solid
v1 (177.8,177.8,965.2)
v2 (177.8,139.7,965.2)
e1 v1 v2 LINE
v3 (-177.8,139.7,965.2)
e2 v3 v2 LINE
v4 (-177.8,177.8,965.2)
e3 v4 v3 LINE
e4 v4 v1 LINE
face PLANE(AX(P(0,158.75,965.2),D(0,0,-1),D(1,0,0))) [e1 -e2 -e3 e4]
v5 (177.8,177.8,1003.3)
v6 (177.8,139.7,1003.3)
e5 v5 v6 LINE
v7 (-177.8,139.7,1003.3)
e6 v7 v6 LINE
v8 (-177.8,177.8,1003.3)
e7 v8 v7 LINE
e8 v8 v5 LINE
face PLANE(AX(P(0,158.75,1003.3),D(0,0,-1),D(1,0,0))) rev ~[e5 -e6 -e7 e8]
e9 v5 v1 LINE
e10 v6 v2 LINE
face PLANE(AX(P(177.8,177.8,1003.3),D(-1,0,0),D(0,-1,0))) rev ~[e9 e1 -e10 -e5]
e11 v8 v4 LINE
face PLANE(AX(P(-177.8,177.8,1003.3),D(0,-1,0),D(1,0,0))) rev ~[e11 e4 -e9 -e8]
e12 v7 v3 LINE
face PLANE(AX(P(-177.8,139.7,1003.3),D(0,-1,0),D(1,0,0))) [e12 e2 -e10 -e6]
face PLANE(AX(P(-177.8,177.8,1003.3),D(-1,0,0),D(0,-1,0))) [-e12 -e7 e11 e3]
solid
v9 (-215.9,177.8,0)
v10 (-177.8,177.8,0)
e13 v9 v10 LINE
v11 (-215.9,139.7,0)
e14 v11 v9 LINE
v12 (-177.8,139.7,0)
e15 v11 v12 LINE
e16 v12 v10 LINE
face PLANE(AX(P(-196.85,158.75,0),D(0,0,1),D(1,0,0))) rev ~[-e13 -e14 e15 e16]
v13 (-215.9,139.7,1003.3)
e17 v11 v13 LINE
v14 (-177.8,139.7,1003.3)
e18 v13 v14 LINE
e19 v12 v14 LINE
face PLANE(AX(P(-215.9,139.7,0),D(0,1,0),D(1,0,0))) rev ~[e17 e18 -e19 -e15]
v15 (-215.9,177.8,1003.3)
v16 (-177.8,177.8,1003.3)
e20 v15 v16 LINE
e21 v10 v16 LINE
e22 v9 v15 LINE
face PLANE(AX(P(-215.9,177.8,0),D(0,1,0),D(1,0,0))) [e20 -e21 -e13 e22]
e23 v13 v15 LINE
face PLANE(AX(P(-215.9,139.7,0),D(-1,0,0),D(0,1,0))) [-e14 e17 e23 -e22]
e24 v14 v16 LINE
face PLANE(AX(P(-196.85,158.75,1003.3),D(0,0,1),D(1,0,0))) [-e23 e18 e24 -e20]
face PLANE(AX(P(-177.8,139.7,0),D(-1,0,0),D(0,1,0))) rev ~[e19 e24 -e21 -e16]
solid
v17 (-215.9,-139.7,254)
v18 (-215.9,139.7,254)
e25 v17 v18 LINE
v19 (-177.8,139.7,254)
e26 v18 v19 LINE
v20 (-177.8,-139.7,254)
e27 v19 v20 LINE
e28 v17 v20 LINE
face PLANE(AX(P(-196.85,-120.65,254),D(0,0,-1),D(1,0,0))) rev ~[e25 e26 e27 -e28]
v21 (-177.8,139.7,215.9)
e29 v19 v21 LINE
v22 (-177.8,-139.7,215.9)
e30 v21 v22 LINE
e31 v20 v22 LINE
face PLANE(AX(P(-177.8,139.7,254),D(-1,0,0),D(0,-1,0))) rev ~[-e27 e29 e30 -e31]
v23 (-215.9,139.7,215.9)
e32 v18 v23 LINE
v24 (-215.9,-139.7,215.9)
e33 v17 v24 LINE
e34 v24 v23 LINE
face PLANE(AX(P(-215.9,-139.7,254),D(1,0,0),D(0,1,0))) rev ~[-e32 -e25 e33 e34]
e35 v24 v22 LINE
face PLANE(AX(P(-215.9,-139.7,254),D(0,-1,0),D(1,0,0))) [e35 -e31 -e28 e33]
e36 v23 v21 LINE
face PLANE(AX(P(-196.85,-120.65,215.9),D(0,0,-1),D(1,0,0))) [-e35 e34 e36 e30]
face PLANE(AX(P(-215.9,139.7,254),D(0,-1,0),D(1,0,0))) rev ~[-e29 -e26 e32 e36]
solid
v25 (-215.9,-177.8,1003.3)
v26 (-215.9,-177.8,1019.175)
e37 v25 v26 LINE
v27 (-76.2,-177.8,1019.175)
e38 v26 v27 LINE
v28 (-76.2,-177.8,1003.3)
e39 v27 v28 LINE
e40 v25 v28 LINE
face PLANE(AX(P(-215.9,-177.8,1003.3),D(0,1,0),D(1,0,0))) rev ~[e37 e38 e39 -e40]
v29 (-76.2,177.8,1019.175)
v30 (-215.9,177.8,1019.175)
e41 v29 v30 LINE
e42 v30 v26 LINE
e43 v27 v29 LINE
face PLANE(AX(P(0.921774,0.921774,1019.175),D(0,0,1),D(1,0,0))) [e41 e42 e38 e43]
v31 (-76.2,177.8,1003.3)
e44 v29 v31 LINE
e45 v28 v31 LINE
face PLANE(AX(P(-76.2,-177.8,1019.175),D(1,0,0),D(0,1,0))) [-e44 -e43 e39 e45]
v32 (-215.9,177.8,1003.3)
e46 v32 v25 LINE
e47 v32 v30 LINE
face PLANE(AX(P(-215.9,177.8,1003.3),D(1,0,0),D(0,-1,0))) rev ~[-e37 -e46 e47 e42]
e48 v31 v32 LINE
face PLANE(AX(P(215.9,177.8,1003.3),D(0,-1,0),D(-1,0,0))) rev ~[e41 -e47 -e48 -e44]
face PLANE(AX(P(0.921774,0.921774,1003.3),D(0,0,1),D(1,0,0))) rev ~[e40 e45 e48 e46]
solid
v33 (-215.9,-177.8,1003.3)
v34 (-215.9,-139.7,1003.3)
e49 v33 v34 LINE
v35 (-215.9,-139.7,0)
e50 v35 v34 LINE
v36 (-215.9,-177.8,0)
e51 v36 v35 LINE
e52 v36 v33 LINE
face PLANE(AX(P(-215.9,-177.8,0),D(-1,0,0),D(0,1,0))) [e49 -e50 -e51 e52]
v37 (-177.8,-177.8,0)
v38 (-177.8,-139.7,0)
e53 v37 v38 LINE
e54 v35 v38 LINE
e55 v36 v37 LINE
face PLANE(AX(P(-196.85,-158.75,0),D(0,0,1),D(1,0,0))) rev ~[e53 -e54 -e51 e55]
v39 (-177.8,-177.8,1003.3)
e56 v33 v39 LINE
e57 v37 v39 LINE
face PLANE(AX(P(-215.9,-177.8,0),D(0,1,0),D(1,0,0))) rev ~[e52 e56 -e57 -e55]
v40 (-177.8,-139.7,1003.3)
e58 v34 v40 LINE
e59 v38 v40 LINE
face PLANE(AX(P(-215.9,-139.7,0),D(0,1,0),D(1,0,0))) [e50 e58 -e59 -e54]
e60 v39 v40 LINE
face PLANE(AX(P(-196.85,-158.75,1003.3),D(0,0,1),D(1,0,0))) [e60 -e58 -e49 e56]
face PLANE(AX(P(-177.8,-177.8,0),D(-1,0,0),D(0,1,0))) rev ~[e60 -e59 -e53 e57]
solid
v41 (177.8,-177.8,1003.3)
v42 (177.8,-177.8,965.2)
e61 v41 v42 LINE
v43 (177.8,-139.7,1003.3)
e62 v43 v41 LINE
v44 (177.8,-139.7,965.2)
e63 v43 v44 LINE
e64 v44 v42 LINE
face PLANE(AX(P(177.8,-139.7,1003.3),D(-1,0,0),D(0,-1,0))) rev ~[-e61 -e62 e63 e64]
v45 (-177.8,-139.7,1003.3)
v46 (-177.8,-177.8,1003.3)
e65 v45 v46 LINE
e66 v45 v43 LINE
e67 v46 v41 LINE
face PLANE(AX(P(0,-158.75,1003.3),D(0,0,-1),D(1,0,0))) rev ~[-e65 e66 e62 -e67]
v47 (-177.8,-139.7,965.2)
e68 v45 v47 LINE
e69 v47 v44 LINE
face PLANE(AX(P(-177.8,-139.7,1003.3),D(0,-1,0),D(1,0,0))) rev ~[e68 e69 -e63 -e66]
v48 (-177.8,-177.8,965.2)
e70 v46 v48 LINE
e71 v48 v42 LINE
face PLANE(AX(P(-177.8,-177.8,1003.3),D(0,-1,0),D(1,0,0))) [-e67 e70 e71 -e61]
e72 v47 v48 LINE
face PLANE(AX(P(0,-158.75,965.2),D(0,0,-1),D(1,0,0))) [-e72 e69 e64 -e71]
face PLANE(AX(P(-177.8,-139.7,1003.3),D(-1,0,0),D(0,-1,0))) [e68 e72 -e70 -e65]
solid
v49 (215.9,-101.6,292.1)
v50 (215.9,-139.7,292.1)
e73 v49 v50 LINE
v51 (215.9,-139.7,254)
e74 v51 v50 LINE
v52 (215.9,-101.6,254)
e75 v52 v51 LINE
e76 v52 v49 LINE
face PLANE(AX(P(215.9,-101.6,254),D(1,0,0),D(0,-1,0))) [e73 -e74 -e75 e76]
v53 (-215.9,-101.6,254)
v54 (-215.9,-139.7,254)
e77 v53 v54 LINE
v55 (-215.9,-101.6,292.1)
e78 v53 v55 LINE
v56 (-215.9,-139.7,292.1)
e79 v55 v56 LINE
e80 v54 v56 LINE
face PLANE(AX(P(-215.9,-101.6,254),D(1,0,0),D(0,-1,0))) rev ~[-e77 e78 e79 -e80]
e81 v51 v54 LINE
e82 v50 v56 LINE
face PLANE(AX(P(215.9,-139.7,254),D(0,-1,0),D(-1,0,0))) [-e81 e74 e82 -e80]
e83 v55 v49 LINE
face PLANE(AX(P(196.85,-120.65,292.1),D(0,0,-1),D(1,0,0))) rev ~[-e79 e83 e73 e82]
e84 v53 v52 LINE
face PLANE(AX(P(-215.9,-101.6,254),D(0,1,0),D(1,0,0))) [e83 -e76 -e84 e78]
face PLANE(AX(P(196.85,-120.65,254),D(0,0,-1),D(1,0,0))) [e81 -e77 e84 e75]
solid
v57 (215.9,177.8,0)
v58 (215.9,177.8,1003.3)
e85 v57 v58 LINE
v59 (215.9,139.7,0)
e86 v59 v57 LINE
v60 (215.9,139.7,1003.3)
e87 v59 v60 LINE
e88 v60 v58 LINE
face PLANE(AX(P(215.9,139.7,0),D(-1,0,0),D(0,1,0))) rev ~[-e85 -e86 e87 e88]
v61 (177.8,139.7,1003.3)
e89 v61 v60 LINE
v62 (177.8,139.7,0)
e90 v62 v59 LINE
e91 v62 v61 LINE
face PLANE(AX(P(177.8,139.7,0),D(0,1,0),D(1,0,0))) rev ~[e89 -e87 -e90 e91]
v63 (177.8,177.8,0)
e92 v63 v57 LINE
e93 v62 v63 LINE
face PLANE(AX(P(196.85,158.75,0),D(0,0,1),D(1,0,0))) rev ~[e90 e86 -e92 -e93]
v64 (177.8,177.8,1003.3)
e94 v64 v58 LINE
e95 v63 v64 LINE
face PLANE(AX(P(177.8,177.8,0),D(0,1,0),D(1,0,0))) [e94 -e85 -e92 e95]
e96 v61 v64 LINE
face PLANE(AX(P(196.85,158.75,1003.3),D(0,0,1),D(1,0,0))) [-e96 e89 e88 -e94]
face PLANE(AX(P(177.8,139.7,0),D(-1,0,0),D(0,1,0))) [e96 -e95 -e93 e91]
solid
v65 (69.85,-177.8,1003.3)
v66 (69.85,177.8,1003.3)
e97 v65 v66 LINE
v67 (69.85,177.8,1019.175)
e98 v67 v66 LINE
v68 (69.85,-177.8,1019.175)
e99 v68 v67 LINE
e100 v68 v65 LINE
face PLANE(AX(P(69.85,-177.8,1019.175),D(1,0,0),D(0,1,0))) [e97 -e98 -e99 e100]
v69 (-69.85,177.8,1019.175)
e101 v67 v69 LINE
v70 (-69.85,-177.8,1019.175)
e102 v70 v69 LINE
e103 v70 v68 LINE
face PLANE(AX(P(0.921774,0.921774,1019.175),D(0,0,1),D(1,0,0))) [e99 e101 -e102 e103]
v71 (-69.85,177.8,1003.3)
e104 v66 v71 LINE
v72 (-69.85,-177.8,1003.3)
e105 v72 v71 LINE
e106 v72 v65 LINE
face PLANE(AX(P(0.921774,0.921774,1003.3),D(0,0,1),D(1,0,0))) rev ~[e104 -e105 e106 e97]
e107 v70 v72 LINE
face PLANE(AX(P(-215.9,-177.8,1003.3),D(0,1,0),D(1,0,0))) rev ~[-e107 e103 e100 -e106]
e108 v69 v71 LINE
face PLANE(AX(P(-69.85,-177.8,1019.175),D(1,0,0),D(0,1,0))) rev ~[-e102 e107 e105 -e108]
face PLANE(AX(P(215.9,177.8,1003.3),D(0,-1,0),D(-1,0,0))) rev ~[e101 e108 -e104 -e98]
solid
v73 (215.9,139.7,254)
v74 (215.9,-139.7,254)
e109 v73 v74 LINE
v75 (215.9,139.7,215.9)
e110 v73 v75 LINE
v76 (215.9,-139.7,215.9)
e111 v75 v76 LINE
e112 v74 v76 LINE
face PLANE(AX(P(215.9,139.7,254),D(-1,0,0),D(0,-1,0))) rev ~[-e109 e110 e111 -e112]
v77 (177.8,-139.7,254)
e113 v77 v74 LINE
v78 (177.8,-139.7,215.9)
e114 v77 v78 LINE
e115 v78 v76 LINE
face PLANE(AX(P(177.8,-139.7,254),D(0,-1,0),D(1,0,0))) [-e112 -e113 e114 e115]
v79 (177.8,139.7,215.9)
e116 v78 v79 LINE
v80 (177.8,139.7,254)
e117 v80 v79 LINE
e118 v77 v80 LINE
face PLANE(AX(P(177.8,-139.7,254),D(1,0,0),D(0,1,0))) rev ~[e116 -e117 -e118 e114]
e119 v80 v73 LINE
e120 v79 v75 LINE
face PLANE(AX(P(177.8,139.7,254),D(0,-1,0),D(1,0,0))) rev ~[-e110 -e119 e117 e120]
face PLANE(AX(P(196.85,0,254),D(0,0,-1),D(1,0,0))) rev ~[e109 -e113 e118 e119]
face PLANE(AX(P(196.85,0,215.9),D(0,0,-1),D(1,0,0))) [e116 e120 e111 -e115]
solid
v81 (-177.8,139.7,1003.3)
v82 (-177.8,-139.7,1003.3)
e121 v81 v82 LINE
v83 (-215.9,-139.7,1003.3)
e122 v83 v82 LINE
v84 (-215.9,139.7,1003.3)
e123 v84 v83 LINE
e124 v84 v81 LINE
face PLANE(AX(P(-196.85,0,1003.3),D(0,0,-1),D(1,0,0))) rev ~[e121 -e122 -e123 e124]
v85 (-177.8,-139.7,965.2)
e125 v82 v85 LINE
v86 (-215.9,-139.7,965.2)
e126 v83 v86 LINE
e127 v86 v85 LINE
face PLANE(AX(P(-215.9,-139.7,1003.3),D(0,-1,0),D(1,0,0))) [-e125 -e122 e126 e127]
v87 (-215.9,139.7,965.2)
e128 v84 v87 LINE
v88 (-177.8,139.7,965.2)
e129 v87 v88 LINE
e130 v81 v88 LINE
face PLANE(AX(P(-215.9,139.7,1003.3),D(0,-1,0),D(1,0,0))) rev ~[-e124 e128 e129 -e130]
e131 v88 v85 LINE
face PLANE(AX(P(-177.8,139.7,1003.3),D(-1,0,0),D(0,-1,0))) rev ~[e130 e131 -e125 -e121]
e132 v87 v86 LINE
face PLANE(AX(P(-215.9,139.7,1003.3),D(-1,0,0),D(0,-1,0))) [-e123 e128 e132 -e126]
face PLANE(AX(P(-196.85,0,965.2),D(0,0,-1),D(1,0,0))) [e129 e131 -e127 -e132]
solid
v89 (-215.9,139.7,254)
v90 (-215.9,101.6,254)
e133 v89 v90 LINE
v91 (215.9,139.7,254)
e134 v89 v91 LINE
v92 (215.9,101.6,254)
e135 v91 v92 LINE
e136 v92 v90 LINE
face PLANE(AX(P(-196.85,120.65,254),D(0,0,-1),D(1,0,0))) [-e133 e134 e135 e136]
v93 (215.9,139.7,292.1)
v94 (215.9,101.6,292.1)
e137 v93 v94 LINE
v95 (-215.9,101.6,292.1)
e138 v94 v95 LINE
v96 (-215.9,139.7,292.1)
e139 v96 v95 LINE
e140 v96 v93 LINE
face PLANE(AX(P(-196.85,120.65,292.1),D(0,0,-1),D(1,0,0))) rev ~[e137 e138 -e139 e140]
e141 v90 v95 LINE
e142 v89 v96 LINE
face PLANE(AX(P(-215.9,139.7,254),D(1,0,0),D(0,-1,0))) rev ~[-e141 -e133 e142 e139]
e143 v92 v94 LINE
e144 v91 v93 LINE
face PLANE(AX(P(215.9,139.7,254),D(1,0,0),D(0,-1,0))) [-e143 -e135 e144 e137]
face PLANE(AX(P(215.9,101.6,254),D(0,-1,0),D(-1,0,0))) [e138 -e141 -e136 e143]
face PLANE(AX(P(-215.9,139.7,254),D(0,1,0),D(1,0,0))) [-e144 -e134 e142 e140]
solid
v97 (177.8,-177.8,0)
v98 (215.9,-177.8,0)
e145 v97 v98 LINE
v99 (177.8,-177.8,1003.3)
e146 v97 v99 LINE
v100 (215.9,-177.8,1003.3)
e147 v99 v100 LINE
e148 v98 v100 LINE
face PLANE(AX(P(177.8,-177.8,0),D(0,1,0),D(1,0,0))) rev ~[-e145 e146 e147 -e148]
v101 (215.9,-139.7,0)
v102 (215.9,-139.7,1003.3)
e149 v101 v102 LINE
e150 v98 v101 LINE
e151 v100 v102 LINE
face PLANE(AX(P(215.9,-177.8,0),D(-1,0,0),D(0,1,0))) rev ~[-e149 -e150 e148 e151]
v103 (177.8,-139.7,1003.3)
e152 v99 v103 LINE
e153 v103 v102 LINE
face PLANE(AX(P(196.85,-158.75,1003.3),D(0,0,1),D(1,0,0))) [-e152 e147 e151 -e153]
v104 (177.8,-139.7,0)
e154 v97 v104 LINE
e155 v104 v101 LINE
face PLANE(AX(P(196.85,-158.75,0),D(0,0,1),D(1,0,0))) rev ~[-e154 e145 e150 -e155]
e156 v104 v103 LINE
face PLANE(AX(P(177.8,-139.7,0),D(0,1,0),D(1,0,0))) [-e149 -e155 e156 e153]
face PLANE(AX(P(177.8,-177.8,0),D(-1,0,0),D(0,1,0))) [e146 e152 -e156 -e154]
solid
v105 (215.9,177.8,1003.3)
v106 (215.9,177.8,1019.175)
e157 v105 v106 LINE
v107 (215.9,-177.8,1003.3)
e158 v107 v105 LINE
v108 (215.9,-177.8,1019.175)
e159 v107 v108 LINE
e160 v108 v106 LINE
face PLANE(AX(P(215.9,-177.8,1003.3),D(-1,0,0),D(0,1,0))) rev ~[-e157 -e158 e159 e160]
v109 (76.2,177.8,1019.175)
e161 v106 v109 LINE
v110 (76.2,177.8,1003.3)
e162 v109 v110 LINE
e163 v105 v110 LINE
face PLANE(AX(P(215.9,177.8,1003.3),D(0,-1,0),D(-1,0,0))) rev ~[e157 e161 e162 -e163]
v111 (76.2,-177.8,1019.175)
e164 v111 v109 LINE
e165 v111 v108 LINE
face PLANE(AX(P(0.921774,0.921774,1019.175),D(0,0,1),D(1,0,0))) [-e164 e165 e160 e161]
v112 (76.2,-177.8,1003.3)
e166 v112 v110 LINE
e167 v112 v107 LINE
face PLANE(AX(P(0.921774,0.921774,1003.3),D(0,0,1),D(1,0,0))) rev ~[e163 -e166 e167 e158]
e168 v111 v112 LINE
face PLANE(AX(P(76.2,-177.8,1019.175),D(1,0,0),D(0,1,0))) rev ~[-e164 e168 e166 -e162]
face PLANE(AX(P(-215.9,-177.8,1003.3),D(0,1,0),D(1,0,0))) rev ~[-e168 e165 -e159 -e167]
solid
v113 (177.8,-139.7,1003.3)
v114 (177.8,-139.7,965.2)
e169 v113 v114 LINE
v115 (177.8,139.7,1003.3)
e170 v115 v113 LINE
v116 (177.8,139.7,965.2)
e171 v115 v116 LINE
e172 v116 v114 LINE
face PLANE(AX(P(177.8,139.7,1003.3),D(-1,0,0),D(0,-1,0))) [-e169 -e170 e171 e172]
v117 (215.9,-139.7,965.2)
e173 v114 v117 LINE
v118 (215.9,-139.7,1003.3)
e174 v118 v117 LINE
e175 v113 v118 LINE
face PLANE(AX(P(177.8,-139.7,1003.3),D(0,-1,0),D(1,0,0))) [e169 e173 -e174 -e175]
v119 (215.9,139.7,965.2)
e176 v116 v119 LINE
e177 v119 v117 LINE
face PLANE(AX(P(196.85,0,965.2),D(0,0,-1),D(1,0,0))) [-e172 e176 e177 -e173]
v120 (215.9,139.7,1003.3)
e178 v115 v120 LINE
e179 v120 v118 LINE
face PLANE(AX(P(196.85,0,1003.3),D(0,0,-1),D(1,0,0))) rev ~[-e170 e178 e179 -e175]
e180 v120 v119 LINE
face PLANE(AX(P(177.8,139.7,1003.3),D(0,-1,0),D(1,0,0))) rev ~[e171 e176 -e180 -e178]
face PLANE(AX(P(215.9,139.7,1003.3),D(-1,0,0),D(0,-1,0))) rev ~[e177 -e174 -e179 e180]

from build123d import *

# Parameters (mm, degrees)
F0_W      = 38.1
F0_H      = 38.1
F1_DEPTH  = 1003.3
F2_W      = 38.1
F2_H      = 38.1
F3_DEPTH  = 15.875
F4_W      = 355.6
F4_H      = 38.1
F5_DEPTH  = 38.1
F4_W_2    = 38.1
F4_H_2    = 279.4
F7_W      = 38.1
F7_H      = 203.2
F7_H_2    = 38.1
F8_DEPTH  = 38.1
F7_W_2    = 355.6
F9_DEPTH  = 38.1
F10_W     = 6.35
F10_H     = 355.6
F11_DEPTH = 1019.176


with BuildPart() as f1:
    # F0 (on Top) → F1 (new body)
    with BuildSketch(Plane.XY):
        with Locations((-196.85, 158.75)):
            Rectangle(F0_W, F0_H)
    extrude(amount=F1_DEPTH)


with BuildPart() as f1b:
    # F0 (on Top) → F1, piece 2 (new body)
    with BuildSketch(Plane.XY):
        with Locations((-196.85, -158.75)):
            Rectangle(F0_W, F0_H)
    extrude(amount=F1_DEPTH)


with BuildPart() as f1c:
    # F0 (on Top) → F1, piece 3 (new body)
    with BuildSketch(Plane.XY):
        with Locations((196.85, -158.75)):
            Rectangle(F0_W, F0_H)
    extrude(amount=F1_DEPTH)


with BuildPart() as f1d:
    # F0 (on Top) → F1, piece 4 (new body)
    with BuildSketch(Plane.XY):
        with Locations((196.85, 158.75)):
            Rectangle(F0_W, F0_H)
    extrude(amount=F1_DEPTH)


with BuildPart() as f3:
    # F2 (on face) → F3 (new body)
    with BuildSketch(Plane.XY.offset(1003.3)):
        Polygon((215.9, -177.8), (215.9, 177.8), (-215.9, 177.8), (-215.9, -139.7), (-177.8, -139.7), (-177.8, -177.8), align=None)
        with Locations((-196.85, -158.75)):
            Rectangle(F2_W, F2_H)
    extrude(amount=F3_DEPTH)

    # F10 (on face) → F11 (cut, through all)
    with BuildSketch(Plane.XY.offset(1019.175)):
        with Locations((-73.025, 0)):
            Rectangle(F10_W, F10_H)
        with Locations((73.025, 0)):
            Rectangle(F10_W, F10_H)
    extrude(amount=-F11_DEPTH, mode=Mode.SUBTRACT)


with BuildPart() as f5:
    # F4 (on face) → F5 (new body)
    with BuildSketch(Plane(origin=(0, 0, 1003.3), x_dir=(1, 0, 0), z_dir=(0, 0, -1))):
        with Locations((0, 158.75)):
            Rectangle(F4_W, F4_H)
    extrude(amount=F5_DEPTH)


with BuildPart() as f5b:
    # F4 (on face) → F5, piece 2 (new body)
    with BuildSketch(Plane(origin=(0, 0, 1003.3), x_dir=(1, 0, 0), z_dir=(0, 0, -1))):
        with Locations((0, -158.75)):
            Rectangle(F4_W, F4_H)
    extrude(amount=F5_DEPTH)


with BuildPart() as f5c:
    # F4 (on face) → F5, piece 3 (new body)
    with BuildSketch(Plane(origin=(0, 0, 1003.3), x_dir=(1, 0, 0), z_dir=(0, 0, -1))):
        with Locations((-196.85, 0)):
            Rectangle(F4_W_2, F4_H_2)
    extrude(amount=F5_DEPTH)


with BuildPart() as f5d:
    # F4 (on face) → F5, piece 4 (new body)
    with BuildSketch(Plane(origin=(0, 0, 1003.3), x_dir=(1, 0, 0), z_dir=(0, 0, -1))):
        with Locations((196.85, 0)):
            Rectangle(F4_W_2, F4_H_2)
    extrude(amount=F5_DEPTH)


with BuildPart() as f8:
    # F7 (on offset) → F8 (new body)
    with BuildSketch(Plane(origin=(0, 0, 254), x_dir=(1, 0, 0), z_dir=(0, 0, -1))):
        with Locations((196.85, 0)):
            Rectangle(F7_W, F7_H)
        with Locations((196.85, -120.65)):
            Rectangle(F7_W, F7_H_2)
        with Locations((196.85, 120.65)):
            Rectangle(F7_W, F7_H_2)
    extrude(amount=F8_DEPTH)


with BuildPart() as f8b:
    # F7 (on offset) → F8, piece 2 (new body)
    with BuildSketch(Plane(origin=(0, 0, 254), x_dir=(1, 0, 0), z_dir=(0, 0, -1))):
        with Locations((-196.85, 120.65)):
            Rectangle(F7_W, F7_H_2)
        with Locations((-196.85, 0)):
            Rectangle(F7_W, F7_H)
        with Locations((-196.85, -120.65)):
            Rectangle(F7_W, F7_H_2)
    extrude(amount=F8_DEPTH)


with BuildPart() as f9:
    # F7 (on offset) → F9 (new body)
    with BuildSketch(Plane(origin=(0, 0, 254), x_dir=(1, 0, 0), z_dir=(0, 0, -1))):
        with Locations((196.85, 120.65)):
            Rectangle(F7_W, F7_H_2)
        with Locations((0, 120.65)):
            Rectangle(F7_W_2, F7_H_2)
        with Locations((-196.85, 120.65)):
            Rectangle(F7_W, F7_H_2)
    extrude(amount=-F9_DEPTH)


with BuildPart() as f9b:
    # F7 (on offset) → F9, piece 2 (new body)
    with BuildSketch(Plane(origin=(0, 0, 254), x_dir=(1, 0, 0), z_dir=(0, 0, -1))):
        with Locations((-196.85, -120.65)):
            Rectangle(F7_W, F7_H_2)
        with Locations((0, -120.65)):
            Rectangle(F7_W_2, F7_H_2)
        with Locations((196.85, -120.65)):
            Rectangle(F7_W, F7_H_2)
    extrude(amount=-F9_DEPTH)


solid = Compound([f1.part, f1b.part, f1c.part, f1d.part, f3.part, f5.part, f5b.part, f5c.part, f5d.part, f8.part, f8b.part, f9.part, f9b.part])
